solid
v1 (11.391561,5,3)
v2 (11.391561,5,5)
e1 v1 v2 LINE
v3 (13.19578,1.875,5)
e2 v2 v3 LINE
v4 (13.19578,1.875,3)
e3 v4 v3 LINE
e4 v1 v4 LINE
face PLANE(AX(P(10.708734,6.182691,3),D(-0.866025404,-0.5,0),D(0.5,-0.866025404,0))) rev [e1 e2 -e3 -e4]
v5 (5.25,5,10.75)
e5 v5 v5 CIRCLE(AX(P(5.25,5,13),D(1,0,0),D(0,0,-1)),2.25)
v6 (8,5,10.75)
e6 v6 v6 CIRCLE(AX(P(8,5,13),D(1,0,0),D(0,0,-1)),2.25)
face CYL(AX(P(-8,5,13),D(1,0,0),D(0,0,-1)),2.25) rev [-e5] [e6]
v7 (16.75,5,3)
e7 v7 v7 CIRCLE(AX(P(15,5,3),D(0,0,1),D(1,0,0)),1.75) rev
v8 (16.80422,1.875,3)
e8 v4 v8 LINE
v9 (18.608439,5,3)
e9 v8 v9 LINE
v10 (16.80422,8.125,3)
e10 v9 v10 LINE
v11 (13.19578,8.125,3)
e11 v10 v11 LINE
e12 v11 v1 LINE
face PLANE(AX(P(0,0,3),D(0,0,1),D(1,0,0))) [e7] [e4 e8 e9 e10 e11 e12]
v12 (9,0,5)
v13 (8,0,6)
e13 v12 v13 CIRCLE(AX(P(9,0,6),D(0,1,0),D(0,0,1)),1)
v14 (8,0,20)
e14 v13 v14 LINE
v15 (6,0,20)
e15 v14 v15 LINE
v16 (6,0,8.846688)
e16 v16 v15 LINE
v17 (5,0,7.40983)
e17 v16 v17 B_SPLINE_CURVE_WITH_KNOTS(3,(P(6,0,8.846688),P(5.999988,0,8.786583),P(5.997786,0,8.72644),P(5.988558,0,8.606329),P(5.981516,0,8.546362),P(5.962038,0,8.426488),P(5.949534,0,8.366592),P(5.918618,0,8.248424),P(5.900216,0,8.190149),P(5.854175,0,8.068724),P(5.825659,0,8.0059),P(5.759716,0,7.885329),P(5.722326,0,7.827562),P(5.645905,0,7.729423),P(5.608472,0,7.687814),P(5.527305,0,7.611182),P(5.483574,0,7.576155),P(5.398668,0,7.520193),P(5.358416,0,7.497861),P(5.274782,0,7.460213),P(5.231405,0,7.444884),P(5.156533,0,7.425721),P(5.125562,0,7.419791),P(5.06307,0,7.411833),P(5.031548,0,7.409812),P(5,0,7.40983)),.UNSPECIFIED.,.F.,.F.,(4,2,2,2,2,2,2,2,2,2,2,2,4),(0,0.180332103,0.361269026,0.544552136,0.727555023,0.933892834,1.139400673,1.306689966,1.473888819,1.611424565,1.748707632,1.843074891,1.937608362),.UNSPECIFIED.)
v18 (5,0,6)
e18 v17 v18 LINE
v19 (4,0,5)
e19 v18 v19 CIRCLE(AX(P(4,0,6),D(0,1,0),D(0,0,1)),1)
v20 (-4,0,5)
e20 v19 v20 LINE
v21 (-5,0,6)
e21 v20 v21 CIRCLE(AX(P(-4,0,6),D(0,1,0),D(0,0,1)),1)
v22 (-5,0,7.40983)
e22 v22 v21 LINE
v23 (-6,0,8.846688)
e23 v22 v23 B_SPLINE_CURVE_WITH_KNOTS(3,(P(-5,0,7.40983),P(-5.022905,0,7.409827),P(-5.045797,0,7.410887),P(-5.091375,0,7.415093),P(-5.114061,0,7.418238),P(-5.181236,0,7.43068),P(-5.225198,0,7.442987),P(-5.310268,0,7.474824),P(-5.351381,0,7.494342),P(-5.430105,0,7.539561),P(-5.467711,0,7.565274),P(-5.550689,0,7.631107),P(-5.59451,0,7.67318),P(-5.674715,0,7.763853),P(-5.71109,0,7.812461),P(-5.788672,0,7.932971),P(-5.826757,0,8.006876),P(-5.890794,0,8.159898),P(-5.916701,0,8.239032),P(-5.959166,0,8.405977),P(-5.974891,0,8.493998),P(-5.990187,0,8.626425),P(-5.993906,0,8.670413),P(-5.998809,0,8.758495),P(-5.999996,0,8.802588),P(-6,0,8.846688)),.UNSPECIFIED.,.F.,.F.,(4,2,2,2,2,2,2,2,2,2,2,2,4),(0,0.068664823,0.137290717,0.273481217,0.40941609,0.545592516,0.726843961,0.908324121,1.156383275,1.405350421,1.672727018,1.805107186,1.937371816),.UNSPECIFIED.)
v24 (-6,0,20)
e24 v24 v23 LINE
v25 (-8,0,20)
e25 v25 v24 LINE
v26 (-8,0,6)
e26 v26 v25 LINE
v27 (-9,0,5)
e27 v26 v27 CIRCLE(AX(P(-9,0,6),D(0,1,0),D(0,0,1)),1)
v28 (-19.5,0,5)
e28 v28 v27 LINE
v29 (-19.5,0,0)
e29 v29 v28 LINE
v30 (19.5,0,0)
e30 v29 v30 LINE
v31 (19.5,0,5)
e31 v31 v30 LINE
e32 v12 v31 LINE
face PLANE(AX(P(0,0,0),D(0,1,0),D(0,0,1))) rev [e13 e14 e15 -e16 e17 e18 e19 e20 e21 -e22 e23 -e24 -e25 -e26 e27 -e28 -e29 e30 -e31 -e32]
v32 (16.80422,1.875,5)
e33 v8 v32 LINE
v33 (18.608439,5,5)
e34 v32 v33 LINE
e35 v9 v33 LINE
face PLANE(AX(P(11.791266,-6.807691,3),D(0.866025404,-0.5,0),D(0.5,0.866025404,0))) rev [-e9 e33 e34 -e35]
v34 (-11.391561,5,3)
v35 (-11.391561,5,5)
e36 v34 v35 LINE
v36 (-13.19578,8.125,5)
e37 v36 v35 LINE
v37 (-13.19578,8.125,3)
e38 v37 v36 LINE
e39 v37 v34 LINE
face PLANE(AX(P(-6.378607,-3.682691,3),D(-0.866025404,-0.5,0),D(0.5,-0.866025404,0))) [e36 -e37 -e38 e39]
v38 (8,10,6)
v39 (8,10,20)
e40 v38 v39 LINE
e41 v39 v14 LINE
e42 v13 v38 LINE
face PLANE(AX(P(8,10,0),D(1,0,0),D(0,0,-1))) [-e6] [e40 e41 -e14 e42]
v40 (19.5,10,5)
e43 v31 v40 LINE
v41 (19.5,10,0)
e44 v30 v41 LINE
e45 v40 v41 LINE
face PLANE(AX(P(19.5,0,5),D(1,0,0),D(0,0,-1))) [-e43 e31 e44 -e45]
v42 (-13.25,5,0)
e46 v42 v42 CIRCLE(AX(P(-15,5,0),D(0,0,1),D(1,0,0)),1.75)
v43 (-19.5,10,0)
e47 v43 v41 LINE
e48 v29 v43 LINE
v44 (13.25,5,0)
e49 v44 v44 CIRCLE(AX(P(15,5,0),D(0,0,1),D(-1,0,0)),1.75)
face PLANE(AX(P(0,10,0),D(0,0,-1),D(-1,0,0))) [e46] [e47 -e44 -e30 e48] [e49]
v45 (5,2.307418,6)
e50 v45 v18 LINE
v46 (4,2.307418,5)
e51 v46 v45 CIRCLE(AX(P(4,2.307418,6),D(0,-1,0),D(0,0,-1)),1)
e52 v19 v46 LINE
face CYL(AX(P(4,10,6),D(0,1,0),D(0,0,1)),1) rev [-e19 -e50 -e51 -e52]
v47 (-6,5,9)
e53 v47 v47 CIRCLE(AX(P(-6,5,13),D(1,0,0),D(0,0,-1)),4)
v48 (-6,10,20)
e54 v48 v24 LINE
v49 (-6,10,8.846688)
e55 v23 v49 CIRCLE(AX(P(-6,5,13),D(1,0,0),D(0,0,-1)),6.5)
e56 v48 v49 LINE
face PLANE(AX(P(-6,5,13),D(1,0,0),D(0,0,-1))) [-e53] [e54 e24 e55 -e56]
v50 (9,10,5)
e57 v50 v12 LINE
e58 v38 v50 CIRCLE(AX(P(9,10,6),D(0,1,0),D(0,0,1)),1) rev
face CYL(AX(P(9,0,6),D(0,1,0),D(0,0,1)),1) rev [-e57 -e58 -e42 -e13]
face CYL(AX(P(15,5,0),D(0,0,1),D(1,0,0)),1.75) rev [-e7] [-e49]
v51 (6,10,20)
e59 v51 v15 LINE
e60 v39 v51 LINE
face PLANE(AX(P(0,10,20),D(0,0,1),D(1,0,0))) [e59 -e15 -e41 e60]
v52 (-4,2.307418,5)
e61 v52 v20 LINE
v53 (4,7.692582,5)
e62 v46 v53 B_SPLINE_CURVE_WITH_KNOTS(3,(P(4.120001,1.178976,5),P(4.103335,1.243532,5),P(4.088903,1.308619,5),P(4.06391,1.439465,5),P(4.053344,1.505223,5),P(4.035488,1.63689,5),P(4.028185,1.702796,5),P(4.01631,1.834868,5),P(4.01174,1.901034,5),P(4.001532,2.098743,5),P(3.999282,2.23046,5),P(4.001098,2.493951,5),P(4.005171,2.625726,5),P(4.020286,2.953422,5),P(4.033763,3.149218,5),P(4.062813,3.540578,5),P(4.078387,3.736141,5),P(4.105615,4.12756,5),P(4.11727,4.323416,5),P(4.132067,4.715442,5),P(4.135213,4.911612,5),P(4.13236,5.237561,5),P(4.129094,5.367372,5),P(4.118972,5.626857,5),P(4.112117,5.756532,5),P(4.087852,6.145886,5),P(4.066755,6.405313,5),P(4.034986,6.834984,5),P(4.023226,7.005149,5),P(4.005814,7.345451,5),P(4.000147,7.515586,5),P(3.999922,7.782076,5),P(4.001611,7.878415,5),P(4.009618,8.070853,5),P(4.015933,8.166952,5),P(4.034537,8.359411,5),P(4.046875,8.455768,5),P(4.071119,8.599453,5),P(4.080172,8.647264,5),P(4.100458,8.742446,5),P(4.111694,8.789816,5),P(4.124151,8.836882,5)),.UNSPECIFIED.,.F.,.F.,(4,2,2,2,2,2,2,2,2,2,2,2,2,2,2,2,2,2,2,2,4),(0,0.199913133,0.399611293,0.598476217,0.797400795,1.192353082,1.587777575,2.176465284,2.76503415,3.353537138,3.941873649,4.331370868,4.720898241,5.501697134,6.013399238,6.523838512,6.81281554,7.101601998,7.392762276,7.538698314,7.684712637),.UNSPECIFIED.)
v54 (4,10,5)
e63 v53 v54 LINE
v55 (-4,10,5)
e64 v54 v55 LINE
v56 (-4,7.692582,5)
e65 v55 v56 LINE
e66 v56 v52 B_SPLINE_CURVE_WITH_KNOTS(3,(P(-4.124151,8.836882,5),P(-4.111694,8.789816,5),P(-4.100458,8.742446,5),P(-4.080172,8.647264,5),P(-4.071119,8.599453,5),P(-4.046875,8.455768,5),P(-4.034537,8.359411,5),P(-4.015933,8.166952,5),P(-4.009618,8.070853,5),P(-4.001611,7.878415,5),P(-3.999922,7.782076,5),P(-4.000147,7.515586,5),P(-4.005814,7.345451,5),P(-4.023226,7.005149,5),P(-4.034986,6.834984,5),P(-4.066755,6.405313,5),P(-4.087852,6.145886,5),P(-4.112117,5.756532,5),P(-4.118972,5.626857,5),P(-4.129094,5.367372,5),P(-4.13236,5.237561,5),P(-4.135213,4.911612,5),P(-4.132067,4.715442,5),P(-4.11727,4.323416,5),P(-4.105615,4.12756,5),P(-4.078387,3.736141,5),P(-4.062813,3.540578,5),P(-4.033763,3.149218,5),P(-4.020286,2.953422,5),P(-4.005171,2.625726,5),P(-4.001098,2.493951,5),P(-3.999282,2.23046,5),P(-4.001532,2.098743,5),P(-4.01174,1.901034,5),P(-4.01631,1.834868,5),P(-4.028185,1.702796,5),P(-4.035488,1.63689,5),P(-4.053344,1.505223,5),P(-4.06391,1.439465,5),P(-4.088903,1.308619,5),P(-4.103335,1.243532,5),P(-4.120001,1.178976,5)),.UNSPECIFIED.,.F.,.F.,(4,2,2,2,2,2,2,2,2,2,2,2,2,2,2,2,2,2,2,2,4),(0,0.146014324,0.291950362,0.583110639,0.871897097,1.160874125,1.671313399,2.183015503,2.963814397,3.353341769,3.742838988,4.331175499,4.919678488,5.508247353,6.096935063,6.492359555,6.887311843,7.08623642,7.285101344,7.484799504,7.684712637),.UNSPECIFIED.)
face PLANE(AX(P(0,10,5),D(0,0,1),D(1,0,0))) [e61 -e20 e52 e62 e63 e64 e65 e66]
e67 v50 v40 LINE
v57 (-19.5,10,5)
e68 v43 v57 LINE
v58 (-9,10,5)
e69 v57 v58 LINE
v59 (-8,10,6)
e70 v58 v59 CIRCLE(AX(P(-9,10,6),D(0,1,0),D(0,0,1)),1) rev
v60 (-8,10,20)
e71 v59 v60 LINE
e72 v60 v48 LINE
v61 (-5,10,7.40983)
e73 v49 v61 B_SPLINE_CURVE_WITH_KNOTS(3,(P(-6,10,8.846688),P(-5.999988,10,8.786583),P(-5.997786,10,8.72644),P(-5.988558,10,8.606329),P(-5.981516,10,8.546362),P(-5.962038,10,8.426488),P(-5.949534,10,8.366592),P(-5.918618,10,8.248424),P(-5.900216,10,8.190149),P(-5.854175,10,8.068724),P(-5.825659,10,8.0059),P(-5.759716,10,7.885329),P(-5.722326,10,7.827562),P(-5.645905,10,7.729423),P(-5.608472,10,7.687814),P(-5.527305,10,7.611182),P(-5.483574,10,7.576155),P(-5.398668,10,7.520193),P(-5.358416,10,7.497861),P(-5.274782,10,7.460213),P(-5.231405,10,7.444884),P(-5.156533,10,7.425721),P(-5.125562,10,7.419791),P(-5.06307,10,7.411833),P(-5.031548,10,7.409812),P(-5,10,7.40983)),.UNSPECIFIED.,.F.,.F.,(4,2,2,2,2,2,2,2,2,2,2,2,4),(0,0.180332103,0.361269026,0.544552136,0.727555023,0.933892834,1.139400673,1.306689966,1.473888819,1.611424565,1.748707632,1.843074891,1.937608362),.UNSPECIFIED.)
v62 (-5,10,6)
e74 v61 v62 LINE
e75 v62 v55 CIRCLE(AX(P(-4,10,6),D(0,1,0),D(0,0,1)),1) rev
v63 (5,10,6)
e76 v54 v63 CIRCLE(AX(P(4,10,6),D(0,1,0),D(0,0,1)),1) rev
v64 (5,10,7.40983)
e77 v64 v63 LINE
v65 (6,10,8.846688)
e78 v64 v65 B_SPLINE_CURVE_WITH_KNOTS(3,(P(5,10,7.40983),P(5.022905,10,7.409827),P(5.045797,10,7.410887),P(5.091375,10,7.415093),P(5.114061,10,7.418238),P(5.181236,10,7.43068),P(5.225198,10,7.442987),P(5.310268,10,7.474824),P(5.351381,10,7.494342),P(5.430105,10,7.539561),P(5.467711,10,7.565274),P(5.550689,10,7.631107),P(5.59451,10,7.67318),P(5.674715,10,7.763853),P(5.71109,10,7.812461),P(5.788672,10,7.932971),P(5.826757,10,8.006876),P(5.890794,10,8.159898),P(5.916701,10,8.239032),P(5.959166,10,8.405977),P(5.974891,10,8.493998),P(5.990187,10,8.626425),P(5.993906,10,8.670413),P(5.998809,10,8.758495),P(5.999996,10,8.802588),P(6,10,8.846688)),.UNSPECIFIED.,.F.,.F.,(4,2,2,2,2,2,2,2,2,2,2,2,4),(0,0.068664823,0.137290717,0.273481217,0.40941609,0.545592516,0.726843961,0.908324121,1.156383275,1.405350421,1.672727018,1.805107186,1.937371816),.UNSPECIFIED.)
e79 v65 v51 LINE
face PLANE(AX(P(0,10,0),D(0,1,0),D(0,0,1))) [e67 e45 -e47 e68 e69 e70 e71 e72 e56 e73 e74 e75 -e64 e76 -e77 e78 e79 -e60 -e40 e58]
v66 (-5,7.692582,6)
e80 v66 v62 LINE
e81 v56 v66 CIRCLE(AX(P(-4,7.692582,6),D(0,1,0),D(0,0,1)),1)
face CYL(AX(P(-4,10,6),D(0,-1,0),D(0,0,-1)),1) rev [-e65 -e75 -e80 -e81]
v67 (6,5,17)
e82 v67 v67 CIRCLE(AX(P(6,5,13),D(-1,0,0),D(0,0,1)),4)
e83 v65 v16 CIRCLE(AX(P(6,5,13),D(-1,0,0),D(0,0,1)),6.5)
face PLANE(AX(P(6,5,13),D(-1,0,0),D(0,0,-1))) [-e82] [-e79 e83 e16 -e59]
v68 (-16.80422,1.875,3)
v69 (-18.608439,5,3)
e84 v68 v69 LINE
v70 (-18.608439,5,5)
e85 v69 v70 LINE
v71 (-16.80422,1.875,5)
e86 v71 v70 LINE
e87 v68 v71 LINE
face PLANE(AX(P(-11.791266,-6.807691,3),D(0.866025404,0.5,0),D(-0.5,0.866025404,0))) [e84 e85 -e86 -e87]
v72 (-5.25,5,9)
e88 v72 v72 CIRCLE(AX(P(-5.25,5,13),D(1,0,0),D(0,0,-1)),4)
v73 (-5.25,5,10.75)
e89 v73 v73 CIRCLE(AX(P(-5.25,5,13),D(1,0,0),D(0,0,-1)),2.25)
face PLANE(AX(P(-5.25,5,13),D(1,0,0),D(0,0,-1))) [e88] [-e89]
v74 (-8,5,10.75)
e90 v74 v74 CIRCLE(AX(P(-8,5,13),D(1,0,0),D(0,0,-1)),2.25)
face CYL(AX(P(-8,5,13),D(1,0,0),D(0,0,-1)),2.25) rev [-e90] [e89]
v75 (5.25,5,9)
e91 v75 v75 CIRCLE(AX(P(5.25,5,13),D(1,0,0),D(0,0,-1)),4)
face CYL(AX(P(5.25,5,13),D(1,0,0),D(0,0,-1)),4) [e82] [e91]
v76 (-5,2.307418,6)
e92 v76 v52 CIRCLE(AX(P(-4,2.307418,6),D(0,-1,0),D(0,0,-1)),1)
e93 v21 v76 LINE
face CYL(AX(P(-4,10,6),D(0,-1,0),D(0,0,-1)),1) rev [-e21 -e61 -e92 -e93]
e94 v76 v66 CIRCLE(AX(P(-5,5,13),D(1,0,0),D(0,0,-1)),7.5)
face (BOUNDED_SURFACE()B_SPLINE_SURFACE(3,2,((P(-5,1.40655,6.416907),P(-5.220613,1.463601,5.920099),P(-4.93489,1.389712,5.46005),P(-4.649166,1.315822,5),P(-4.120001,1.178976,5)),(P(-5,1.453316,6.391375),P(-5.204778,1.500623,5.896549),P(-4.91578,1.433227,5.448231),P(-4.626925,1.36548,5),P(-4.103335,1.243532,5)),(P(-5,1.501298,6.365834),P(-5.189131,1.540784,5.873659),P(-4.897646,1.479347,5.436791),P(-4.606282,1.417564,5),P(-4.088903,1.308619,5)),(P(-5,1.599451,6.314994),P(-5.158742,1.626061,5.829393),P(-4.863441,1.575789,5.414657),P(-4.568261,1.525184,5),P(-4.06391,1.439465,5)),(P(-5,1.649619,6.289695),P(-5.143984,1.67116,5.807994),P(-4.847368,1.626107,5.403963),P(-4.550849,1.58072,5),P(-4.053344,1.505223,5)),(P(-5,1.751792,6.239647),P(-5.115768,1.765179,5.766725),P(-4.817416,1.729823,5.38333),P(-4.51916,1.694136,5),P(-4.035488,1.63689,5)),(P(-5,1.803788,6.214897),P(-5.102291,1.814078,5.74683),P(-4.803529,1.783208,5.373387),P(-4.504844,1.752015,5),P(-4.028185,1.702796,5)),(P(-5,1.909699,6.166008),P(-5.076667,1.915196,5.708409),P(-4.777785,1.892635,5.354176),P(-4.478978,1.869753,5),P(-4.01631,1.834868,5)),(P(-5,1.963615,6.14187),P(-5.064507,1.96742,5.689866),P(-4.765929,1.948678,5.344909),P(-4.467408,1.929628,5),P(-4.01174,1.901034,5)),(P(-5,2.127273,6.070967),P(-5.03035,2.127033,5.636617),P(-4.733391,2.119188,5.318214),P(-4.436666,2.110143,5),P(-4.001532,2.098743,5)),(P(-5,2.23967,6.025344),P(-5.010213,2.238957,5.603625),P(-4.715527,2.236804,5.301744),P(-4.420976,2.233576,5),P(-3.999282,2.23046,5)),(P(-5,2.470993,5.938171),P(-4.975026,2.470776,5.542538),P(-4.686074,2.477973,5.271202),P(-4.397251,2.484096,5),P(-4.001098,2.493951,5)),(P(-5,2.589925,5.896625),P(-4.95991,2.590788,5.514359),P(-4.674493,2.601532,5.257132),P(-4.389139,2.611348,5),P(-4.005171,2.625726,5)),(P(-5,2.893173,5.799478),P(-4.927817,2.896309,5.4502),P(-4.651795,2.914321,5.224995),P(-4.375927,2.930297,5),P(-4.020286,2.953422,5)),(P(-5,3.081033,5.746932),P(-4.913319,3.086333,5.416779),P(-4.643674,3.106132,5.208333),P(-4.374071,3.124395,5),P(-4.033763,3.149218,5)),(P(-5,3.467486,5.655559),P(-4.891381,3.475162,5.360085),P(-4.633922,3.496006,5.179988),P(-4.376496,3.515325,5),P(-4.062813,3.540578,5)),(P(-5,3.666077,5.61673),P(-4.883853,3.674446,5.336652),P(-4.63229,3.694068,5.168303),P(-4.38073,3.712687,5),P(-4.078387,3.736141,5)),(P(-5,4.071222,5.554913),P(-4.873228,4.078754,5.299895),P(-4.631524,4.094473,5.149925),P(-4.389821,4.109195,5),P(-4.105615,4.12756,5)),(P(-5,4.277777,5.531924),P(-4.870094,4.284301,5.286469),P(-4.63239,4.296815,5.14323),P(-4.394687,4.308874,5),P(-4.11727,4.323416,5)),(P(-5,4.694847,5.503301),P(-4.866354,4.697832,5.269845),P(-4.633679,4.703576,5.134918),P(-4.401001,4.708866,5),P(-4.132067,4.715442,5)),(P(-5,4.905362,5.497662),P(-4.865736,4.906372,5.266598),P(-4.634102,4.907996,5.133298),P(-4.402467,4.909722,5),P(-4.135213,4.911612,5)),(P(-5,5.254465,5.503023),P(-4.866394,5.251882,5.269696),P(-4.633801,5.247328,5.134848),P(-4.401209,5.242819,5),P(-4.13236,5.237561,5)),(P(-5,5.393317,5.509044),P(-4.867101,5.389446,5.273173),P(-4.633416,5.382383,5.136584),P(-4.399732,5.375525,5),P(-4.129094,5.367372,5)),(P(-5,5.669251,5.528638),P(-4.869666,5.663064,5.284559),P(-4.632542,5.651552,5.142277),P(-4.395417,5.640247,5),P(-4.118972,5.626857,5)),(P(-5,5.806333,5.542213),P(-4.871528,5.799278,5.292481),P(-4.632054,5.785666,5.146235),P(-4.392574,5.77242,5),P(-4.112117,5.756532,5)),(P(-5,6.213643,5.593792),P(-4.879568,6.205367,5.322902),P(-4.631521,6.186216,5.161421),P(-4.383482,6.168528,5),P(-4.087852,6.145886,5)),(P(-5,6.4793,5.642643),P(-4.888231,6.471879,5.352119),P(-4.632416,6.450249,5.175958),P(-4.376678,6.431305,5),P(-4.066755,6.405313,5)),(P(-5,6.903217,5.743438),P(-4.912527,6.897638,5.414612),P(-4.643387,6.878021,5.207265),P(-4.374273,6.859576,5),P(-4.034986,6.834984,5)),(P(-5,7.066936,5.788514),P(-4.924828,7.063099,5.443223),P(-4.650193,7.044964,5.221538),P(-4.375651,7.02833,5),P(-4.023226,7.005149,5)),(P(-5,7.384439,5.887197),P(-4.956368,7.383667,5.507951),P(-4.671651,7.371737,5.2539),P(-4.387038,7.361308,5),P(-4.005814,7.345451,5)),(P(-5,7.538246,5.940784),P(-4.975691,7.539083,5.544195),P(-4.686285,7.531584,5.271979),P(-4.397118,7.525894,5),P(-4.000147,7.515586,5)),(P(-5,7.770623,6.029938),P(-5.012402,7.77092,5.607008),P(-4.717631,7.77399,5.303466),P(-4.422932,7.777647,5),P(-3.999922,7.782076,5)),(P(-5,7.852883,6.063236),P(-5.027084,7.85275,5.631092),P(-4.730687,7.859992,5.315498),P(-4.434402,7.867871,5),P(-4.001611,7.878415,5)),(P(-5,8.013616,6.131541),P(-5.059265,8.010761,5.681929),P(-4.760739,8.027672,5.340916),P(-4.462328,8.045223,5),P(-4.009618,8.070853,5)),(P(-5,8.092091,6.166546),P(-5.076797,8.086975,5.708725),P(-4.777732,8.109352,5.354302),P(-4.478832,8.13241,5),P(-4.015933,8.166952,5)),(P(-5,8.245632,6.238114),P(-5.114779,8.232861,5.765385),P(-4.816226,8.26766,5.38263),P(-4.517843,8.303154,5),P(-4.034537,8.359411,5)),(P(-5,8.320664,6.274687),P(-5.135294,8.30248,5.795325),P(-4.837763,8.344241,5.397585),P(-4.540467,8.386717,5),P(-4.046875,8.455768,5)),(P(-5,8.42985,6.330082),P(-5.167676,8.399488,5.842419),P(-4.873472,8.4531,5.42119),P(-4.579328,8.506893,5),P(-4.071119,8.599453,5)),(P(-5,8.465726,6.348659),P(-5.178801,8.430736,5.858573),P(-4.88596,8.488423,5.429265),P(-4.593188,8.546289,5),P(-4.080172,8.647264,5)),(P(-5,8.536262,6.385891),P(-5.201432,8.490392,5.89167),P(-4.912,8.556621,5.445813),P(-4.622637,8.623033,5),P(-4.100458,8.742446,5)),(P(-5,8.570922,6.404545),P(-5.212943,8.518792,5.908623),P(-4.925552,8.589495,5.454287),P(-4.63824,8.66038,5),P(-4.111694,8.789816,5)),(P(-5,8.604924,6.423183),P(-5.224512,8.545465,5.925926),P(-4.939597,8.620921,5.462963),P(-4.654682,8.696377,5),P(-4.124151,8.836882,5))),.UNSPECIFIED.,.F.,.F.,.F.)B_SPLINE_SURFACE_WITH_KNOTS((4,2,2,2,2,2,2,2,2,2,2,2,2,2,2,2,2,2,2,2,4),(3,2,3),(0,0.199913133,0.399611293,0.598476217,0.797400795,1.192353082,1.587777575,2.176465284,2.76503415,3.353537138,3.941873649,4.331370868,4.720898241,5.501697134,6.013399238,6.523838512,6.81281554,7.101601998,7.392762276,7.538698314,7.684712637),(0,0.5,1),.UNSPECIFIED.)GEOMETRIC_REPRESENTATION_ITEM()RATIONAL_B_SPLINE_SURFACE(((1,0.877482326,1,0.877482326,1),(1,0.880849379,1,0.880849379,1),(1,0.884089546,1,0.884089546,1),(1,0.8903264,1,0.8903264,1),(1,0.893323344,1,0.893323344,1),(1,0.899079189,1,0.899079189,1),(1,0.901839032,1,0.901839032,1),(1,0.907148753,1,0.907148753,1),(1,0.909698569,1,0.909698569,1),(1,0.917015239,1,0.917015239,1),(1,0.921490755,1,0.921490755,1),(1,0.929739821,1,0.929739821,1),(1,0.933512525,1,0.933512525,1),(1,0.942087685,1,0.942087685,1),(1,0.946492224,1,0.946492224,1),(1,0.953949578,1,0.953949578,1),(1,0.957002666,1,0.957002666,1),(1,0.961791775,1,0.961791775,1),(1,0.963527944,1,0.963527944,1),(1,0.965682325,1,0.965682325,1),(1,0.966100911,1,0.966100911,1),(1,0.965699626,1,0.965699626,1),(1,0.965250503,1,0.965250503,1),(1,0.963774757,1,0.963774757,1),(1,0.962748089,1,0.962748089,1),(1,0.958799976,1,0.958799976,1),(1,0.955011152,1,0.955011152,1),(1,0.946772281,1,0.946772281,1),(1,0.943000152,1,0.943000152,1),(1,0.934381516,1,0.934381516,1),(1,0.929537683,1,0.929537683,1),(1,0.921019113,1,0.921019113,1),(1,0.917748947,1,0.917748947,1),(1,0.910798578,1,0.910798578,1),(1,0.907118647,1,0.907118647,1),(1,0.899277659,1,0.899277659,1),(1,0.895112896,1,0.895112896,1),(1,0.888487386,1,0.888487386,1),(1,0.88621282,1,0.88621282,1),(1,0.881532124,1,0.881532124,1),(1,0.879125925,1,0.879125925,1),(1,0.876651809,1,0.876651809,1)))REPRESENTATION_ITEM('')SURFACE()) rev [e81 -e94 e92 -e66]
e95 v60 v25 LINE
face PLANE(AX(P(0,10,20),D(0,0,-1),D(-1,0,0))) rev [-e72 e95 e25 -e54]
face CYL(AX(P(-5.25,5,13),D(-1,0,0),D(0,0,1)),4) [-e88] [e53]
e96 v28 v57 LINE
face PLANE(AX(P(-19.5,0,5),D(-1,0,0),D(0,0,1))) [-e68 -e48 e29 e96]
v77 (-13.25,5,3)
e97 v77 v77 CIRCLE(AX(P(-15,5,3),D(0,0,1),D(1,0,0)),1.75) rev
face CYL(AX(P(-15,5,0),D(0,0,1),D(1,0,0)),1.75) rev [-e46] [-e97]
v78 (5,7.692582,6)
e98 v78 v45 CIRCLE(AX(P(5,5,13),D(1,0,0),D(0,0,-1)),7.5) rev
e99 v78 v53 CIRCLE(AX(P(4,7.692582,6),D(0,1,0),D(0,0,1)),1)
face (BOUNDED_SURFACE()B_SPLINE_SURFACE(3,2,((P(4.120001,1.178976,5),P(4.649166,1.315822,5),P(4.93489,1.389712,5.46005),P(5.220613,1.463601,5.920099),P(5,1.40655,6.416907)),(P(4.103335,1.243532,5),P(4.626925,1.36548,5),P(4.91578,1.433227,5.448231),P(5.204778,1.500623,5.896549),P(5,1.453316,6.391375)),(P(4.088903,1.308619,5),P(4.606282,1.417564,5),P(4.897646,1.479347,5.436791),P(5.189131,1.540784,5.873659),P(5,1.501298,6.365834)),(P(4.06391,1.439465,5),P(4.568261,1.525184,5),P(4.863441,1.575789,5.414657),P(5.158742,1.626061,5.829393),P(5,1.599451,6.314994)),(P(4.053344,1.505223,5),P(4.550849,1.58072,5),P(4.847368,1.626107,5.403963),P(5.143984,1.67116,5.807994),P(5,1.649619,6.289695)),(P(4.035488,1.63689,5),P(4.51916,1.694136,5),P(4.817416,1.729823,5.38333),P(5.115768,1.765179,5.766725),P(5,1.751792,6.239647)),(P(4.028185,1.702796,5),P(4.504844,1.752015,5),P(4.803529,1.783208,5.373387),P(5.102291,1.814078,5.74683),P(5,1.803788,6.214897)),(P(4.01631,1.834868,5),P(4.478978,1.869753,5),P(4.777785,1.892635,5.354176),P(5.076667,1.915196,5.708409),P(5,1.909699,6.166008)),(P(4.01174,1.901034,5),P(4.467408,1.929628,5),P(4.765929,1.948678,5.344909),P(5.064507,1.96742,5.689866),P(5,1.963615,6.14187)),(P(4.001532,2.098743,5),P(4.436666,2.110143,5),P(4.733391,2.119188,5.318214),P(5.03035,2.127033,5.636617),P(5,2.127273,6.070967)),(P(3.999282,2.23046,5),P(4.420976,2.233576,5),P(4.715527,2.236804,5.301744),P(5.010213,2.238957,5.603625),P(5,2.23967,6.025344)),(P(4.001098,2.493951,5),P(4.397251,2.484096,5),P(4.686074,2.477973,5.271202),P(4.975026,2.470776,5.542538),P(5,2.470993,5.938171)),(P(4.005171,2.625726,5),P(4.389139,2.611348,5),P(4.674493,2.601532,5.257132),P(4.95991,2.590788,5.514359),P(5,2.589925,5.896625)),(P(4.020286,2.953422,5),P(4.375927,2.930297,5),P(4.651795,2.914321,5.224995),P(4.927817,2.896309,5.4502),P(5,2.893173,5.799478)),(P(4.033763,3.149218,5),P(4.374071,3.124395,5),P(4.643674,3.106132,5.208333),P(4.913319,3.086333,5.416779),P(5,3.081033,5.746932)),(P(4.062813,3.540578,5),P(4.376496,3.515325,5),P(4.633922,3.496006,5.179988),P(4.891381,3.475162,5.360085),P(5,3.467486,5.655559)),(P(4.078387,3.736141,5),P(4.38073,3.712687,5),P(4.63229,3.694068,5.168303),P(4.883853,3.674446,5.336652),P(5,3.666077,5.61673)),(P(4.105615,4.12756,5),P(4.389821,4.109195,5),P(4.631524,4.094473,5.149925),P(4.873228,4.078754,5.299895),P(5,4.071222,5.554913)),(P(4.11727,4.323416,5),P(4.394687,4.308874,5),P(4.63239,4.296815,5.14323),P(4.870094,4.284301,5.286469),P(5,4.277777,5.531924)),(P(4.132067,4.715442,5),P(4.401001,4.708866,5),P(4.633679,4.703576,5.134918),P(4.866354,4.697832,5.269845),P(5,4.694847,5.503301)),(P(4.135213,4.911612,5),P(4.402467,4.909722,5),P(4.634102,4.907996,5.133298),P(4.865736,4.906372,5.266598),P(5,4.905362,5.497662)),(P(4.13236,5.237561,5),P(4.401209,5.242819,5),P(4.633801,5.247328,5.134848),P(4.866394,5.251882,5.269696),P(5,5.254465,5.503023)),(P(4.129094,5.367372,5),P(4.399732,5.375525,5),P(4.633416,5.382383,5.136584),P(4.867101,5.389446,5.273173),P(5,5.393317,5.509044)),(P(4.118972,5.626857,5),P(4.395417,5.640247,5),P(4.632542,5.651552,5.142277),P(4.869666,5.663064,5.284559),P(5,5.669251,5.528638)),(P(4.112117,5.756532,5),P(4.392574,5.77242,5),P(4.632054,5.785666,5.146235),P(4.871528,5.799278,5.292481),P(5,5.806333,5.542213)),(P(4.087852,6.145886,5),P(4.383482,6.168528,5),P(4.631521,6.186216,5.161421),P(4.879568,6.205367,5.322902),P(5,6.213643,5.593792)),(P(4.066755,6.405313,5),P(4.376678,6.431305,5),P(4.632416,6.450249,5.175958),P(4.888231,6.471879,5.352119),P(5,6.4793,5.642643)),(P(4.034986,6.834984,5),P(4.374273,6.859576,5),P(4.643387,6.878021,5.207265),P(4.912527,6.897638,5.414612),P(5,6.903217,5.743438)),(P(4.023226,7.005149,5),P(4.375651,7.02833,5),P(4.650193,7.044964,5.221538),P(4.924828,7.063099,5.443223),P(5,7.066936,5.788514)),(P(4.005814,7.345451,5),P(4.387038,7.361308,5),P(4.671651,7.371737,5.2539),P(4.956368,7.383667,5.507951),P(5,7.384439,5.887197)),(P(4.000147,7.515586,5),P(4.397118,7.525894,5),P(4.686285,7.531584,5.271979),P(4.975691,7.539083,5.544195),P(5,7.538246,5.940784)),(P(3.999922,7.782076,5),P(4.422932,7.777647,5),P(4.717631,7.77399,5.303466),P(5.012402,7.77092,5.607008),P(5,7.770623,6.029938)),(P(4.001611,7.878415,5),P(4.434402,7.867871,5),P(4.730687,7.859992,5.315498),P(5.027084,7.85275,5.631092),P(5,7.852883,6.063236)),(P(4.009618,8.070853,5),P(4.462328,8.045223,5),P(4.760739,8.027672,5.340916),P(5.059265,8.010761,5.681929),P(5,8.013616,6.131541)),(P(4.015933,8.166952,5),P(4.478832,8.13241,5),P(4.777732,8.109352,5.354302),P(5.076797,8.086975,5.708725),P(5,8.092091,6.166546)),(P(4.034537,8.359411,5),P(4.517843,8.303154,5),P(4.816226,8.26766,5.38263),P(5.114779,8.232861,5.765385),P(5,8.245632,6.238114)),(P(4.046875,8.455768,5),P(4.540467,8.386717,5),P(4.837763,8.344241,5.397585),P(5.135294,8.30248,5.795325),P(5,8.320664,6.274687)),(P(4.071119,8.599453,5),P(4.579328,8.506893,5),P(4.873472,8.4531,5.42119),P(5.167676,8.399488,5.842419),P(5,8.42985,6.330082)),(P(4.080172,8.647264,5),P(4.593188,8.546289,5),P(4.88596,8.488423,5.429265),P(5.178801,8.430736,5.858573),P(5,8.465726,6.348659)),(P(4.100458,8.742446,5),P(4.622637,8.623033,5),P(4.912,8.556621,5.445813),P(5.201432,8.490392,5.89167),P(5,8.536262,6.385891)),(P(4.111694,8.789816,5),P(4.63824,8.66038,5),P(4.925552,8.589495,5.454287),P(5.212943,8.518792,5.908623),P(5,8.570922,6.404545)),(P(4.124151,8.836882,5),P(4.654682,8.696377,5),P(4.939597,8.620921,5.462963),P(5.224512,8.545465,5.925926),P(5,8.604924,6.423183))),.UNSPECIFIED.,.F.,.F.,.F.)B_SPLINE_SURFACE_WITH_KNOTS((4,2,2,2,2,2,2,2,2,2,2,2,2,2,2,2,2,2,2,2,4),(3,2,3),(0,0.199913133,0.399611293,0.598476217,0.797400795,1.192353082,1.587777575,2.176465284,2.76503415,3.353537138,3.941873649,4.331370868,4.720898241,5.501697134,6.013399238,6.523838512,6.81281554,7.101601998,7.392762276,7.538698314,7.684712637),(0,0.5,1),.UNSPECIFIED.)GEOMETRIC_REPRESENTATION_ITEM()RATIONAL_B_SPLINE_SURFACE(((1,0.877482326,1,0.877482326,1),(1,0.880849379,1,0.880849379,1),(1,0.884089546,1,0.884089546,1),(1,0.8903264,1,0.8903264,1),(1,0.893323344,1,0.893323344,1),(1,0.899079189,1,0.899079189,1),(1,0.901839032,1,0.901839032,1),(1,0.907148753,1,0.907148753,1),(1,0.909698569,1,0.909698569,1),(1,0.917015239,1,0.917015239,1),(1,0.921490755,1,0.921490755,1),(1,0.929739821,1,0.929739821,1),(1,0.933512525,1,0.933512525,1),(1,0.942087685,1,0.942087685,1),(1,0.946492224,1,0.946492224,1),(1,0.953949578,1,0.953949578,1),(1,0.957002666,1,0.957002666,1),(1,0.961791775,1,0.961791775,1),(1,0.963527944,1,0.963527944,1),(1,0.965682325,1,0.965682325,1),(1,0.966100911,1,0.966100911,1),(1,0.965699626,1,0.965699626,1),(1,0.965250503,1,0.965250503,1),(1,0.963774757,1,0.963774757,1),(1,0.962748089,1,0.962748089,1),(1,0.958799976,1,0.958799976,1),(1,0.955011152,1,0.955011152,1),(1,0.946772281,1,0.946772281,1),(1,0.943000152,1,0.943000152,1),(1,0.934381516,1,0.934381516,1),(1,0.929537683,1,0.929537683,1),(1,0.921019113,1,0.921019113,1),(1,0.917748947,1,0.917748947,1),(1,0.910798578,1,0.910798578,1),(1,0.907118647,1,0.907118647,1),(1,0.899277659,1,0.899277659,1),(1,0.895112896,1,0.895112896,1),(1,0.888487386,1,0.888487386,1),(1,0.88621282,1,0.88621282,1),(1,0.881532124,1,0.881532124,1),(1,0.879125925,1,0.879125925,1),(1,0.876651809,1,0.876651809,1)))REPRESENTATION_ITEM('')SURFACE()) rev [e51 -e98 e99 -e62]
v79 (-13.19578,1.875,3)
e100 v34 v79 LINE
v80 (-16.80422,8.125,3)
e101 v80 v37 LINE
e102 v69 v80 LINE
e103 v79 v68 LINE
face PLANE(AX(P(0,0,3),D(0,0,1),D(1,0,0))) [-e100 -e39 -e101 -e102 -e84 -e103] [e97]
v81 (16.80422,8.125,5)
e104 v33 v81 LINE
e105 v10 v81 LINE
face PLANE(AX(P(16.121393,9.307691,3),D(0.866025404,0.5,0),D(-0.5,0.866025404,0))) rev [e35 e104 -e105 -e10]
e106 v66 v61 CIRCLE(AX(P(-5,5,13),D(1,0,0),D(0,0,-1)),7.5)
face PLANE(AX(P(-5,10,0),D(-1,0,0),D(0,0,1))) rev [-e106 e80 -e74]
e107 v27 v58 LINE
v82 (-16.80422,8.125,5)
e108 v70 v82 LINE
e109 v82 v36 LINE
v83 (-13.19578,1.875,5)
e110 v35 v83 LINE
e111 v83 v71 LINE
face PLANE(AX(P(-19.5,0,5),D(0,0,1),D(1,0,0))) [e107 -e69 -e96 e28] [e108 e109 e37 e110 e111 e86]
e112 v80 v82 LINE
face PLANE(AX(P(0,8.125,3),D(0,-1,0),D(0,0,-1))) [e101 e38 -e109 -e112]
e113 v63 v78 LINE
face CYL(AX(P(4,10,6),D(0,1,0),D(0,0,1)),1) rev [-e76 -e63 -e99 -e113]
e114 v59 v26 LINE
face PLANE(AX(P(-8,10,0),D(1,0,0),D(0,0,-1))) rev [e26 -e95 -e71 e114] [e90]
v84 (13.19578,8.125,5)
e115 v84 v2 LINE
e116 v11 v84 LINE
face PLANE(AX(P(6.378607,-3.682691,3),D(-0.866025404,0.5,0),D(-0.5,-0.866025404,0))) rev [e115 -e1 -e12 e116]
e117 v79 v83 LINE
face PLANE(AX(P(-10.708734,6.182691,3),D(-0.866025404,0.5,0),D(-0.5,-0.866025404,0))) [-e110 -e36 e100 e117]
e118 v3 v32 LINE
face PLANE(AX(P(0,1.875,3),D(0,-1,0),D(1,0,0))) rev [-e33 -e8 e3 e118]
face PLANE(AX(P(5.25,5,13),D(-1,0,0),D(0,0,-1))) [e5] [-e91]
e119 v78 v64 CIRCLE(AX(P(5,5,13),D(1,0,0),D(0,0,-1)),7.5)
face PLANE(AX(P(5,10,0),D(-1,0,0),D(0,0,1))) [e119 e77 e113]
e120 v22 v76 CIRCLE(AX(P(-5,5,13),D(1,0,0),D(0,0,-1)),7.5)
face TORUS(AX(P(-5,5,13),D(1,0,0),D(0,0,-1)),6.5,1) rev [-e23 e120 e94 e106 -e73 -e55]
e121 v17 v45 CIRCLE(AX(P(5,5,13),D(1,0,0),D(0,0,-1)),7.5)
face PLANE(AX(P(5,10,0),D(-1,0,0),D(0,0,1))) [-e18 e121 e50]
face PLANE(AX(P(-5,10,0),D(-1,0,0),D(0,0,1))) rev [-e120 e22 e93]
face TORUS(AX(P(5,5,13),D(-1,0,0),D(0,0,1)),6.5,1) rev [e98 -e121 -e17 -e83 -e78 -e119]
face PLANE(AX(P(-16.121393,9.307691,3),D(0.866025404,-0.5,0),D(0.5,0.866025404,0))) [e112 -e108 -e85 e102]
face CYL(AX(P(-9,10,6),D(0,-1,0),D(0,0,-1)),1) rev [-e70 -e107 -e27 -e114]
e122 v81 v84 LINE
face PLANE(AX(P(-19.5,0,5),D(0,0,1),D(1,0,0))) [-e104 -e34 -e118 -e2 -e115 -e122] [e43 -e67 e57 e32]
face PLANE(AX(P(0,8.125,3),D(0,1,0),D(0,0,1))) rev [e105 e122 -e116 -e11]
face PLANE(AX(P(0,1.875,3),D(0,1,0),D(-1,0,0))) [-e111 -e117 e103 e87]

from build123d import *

# Parameters (mm, degrees)
BOSS_EXTRUDE1_DEPTH = 10
SKETCH2_R           = 2.25
CUT_EXTRUDE1_DEPTH  = 28.49545417
SKETCH3_W           = 39
SKETCH3_H           = 5
BOSS_EXTRUDE2_DEPTH = 10
SKETCH4_R           = 1.75
CUT_EXTRUDE2_DEPTH  = 27.55654345
CUT_EXTRUDE3_DEPTH  = 1
BOSS_EXTRUDE3_START = 0.75
SKETCH5_R           = 4
SKETCH5_R_2         = 2.25
BOSS_EXTRUDE3_DEPTH = 0.75
FILLET1_R           = 1
SKETCH7_R           = 1.75
CUT_EXTRUDE4_DEPTH  = 2


with BuildPart() as part:
    # Sketch1 → Boss-Extrude1 (new body)
    with BuildSketch(Plane(origin=(0, 0, 0), x_dir=(1, 0, 0), z_dir=(0, 1, 0))):
        Polygon((8, 0), (0, 0), (0, -5), (5, -5), (5, -20), (8, -20), align=None)
        Polygon((0, -5), (0, 0), (-8, 0), (-8, -20), (-5, -20), (-5, -5), align=None)
    extrude(amount=BOSS_EXTRUDE1_DEPTH)

    # Sketch2 → Cut-Extrude1 (cut, through all)
    with BuildSketch(Plane(origin=(8, 0, 0), x_dir=(0, 0, -1), z_dir=(1, 0, 0))):
        with Locations((-13, 5)):
            Circle(SKETCH2_R)
    extrude(amount=-CUT_EXTRUDE1_DEPTH, mode=Mode.SUBTRACT)

    # Sketch3 → Boss-Extrude2 (add, through all)
    with BuildSketch(Plane(origin=(0, 10, 0), x_dir=(1, 0, 0), z_dir=(0, 1, 0))):
        with Locations((0, -2.5)):
            Rectangle(SKETCH3_W, SKETCH3_H)
    extrude(amount=-BOSS_EXTRUDE2_DEPTH)

    # Sketch4 → Cut-Extrude2 (cut, through all)
    with BuildSketch(Plane.XY.offset(5)):
        with Locations((-15, 5)):
            Circle(SKETCH4_R)
        with Locations(Location((15, 5, 0), (0, 0, 180))):
            Circle(SKETCH4_R)
    extrude(amount=-CUT_EXTRUDE2_DEPTH, mode=Mode.SUBTRACT)

    # Sketch6 → Cut-Extrude3 (cut)
    with BuildSketch(Plane(origin=(-5, 0, 0), x_dir=(0, 0, -1), z_dir=(1, 0, 0))):
        with BuildLine():
            Line((-13, 12.5), (-20.5, 12.5))
            Line((-20.5, 12.5), (-20.5, 5))
            Line((-20.5, 5), (-20.5, -2.5))
            Line((-20.5, -2.5), (-13, -2.5))
            ThreePointArc((-13, -2.5), (-5.5, 5), (-13, 12.5))
        make_face()
    cut_extrude3 = extrude(amount=-CUT_EXTRUDE3_DEPTH, mode=Mode.SUBTRACT)

    # Sketch5 → Boss-Extrude3 (add)
    with BuildSketch(Plane(origin=(-6, 0, 0), x_dir=(0, 0, -1), z_dir=(1, 0, 0)).offset(BOSS_EXTRUDE3_START)):
        with Locations((-13, 5)):
            Circle(SKETCH5_R)
        with Locations((-13, 5)):
            Circle(SKETCH5_R_2, mode=Mode.SUBTRACT)
    boss_extrude3 = extrude(amount=-BOSS_EXTRUDE3_DEPTH)

    # Mirror1: Cut-Extrude3, Boss-Extrude3 across plane
    add(cut_extrude3.mirror(Plane(origin=(0, 0, 0), x_dir=(0, 0, 1), z_dir=(1, 0, 0))), mode=Mode.SUBTRACT)
    add(boss_extrude3.mirror(Plane(origin=(0, 0, 0), x_dir=(0, 0, 1), z_dir=(1, 0, 0))))

    # Fillet1
    fillet1_edges = [part.edges().sort_by_distance(p)[0] for p in [
        (-6, 5, 5.5),
        (6, 5, 5.5),
        (5, 5, 5),
        (-5, 5, 5),
        (8, 5, 5),
        (-8, 5, 5),
    ]]
    fillet(fillet1_edges, radius=FILLET1_R - 0.0001)  # a hair under: the kernel refuses the full size

    # Sketch7 → Cut-Extrude4 (cut)
    # profile 1 of 3: a face of its own
    with BuildSketch(Plane.XY.offset(5)):
        Polygon((-16.804219591, 8.125), (-13.195780409, 8.125), (-11.391560818, 5), (-13.195780409, 1.875), (-16.804219591, 1.875), (-18.608439182, 5), align=None)
    # profile 2 of 3: a face of its own
    with BuildSketch(Plane.XY.offset(5)):
        Polygon((16.804219591, 1.875), (18.608439182, 5), (16.804219591, 8.125), (13.195780409, 8.125), (11.391560818, 5), (13.195780409, 1.875), align=None)
        with Locations((15, 5)):
            Circle(SKETCH7_R, mode=Mode.SUBTRACT)
    # profile 3 of 3: a face of its own
    with BuildSketch(Plane.XY.offset(5)):
        with Locations((15, 5)):
            Circle(SKETCH7_R)
    extrude(amount=-CUT_EXTRUDE4_DEPTH, mode=Mode.SUBTRACT)


solid = part.part
